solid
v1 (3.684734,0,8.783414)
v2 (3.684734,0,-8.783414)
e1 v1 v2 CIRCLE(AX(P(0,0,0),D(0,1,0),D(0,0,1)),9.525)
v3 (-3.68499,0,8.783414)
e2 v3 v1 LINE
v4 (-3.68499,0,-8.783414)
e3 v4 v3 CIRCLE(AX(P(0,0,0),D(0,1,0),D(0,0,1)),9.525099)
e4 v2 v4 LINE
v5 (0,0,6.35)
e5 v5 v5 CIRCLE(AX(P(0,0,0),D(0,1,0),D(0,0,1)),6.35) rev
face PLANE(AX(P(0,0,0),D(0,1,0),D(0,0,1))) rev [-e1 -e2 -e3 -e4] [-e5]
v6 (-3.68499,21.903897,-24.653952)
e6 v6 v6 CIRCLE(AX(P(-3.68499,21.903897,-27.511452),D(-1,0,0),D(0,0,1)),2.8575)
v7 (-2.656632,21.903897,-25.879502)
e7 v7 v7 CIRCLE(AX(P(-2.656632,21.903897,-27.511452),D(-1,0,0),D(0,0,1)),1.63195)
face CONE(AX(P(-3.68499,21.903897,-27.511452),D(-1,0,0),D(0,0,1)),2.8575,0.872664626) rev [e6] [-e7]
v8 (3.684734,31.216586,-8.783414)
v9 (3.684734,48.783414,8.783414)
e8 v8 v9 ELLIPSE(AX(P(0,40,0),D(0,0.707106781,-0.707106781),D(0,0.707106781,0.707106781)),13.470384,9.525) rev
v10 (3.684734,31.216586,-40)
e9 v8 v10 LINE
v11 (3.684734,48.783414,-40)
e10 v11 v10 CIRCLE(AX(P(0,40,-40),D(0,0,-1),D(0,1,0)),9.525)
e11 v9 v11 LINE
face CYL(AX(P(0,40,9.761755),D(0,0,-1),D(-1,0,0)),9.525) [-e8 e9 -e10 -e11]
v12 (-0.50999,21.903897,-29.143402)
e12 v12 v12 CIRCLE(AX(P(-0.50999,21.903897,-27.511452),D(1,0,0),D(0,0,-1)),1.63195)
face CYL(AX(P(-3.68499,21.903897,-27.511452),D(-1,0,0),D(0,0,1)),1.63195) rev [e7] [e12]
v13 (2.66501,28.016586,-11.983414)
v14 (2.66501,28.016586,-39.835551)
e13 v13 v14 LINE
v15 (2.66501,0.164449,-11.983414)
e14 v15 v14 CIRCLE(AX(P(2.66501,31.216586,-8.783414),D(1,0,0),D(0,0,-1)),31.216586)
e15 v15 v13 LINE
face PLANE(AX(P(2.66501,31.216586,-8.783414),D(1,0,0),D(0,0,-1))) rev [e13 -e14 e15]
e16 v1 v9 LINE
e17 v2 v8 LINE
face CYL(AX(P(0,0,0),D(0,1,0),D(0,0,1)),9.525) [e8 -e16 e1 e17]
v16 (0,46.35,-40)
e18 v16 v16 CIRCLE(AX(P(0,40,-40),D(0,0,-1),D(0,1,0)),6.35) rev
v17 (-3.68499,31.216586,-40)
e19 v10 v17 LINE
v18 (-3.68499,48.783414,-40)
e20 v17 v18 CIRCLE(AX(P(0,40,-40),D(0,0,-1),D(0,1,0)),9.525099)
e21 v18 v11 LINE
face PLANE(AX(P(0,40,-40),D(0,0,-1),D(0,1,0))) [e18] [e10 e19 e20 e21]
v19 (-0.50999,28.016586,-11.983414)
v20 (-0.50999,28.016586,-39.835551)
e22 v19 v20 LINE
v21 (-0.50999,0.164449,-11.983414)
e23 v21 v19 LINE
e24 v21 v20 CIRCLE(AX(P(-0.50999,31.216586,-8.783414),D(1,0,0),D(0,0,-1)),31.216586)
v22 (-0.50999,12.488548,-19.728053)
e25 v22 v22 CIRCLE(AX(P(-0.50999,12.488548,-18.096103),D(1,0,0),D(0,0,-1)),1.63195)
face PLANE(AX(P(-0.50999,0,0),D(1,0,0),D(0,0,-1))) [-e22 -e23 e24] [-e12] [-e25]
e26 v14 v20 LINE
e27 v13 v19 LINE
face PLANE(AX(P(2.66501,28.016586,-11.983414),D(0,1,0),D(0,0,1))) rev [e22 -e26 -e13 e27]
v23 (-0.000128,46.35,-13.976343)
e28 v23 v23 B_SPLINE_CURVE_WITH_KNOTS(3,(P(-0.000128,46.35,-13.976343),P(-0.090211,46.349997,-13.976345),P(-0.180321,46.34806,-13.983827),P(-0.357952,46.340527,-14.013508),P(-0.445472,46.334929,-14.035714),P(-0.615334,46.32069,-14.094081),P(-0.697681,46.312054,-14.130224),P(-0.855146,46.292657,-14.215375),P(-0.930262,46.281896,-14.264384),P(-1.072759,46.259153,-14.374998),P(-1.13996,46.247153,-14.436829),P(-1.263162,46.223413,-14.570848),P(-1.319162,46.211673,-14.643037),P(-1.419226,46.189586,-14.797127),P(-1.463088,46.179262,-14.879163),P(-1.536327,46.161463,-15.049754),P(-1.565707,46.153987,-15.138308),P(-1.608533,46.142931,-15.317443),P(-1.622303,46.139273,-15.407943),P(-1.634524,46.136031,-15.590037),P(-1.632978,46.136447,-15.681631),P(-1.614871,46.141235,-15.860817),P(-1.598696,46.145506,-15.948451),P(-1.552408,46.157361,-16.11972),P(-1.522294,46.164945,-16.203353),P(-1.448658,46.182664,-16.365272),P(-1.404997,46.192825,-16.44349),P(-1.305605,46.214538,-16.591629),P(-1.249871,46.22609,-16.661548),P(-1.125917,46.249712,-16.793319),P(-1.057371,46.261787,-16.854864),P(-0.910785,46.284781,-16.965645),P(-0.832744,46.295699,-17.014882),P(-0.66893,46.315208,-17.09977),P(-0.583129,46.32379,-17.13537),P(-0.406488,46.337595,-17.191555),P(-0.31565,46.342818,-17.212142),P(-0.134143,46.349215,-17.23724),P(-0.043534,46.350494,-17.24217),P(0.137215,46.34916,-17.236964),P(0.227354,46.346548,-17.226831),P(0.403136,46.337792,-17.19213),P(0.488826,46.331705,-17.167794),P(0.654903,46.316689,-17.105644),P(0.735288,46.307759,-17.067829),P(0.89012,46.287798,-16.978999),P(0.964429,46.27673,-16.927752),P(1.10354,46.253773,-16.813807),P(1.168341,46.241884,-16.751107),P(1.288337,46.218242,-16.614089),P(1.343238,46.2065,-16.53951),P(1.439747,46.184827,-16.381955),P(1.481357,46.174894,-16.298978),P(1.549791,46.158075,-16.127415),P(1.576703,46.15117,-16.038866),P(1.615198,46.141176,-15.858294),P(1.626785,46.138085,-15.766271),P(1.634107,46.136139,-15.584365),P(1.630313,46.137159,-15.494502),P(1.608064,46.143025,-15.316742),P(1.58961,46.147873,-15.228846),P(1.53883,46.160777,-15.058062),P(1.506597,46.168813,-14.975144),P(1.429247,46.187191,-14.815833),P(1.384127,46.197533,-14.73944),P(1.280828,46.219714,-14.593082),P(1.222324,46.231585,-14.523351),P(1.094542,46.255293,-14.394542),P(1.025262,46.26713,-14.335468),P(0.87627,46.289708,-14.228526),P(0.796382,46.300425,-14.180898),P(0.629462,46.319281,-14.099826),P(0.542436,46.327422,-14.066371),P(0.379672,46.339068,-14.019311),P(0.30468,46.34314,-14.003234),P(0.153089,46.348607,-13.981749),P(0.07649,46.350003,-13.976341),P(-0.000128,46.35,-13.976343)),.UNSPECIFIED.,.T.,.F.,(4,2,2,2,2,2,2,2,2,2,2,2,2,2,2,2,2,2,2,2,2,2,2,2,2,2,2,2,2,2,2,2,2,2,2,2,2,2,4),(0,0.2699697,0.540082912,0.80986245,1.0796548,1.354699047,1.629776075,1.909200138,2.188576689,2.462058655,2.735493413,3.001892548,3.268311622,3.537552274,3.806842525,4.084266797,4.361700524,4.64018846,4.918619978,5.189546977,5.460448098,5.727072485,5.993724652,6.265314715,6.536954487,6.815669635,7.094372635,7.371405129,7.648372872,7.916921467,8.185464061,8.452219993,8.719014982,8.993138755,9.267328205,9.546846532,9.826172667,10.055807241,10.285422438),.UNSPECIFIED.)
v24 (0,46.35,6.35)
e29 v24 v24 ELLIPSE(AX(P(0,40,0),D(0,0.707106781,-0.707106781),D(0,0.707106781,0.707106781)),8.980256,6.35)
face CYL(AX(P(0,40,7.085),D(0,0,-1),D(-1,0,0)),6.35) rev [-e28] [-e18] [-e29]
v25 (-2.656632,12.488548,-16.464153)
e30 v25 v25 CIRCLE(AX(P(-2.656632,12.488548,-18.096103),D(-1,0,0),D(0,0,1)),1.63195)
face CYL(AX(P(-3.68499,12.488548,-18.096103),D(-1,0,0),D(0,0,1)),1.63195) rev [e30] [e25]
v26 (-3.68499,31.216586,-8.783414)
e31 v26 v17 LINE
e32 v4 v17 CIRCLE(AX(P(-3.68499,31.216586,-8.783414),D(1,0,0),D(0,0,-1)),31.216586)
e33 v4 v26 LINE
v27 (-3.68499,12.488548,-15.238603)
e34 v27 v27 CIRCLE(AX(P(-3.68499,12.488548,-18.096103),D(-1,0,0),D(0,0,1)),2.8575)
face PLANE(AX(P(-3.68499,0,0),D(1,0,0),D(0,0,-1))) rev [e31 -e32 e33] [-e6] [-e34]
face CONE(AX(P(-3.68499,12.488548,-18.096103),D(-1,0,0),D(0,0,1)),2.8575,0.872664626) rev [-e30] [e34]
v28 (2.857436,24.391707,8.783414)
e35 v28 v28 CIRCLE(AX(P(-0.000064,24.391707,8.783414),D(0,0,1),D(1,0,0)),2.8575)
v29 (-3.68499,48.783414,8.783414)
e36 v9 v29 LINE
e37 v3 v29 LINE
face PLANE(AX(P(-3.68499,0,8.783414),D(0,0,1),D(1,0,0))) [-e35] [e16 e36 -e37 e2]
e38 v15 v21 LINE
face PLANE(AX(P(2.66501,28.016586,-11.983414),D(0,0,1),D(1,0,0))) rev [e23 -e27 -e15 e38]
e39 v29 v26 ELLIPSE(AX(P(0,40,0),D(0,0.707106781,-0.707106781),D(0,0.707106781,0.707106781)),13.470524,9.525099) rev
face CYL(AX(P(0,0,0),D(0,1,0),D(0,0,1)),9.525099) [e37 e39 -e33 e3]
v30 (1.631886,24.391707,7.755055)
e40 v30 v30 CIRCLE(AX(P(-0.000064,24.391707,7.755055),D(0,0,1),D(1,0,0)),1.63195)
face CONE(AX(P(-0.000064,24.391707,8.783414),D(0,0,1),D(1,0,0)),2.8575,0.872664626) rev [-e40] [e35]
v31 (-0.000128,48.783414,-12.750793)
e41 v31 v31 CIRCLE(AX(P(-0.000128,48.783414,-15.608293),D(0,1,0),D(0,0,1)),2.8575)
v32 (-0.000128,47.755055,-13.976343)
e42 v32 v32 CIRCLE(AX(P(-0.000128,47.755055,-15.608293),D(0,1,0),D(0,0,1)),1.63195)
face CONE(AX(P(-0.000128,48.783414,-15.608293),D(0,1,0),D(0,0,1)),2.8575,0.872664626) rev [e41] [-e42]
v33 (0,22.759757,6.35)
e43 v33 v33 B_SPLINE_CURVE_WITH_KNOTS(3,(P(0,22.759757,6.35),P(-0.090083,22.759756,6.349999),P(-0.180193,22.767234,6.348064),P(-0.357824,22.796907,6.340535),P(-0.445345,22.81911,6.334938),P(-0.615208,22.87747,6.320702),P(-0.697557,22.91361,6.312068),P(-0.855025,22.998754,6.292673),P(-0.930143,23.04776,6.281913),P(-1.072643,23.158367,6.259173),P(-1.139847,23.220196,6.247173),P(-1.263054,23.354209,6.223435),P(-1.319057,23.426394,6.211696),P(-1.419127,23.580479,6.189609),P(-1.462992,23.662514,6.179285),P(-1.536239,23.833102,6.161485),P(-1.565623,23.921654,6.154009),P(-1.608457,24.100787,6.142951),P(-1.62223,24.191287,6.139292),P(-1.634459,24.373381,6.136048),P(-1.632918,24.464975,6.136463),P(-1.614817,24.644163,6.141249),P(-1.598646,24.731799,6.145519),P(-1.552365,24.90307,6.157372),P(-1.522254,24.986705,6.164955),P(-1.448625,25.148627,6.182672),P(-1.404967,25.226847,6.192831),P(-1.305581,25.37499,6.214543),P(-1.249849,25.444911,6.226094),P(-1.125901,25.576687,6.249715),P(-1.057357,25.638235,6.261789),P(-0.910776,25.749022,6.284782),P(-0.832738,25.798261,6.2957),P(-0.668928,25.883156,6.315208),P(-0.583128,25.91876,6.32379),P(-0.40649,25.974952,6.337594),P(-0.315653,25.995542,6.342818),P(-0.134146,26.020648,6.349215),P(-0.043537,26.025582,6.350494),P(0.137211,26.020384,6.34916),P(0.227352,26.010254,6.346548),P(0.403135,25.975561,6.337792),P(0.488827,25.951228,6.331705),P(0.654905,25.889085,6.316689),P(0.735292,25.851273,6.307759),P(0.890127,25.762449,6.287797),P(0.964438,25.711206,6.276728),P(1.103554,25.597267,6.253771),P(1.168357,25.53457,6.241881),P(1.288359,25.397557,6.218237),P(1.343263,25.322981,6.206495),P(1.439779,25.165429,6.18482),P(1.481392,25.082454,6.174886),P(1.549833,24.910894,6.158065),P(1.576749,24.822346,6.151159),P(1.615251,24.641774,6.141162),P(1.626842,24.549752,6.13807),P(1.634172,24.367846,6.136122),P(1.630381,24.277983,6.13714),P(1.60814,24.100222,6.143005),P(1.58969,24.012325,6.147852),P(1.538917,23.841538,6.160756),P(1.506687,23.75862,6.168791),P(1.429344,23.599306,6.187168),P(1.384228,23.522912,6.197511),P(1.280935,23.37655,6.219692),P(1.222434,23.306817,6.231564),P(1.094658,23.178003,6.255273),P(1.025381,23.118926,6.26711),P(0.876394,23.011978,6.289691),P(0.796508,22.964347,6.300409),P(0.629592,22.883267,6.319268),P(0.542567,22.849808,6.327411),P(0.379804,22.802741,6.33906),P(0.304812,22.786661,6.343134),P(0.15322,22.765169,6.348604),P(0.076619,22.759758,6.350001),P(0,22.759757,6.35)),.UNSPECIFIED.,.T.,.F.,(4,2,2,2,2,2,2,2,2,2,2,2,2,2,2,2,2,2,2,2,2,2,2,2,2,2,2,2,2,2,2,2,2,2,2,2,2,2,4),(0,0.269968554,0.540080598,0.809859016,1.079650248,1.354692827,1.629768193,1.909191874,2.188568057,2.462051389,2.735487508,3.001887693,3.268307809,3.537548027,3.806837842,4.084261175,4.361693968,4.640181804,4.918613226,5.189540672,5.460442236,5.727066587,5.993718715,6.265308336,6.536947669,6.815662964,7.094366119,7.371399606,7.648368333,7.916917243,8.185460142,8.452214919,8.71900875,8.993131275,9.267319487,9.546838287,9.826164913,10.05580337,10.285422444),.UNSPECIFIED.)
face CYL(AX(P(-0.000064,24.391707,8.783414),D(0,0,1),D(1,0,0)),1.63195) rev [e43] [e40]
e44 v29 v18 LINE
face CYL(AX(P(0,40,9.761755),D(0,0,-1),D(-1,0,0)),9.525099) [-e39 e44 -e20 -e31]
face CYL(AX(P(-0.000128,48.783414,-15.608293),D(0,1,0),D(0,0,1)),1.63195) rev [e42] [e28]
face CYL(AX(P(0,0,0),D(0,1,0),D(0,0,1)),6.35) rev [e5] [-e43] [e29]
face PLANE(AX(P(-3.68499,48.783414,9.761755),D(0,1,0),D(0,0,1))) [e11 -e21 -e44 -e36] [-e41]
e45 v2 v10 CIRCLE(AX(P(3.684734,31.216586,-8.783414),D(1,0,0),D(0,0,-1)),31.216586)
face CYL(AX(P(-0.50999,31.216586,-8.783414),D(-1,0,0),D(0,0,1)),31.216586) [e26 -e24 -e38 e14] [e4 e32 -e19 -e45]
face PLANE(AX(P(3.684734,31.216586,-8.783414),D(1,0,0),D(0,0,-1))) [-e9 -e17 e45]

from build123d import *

# Parameters (mm, degrees)
SKETCH2_R                                       = 6.35
BOSS_EXTRUDE3_DEPTH                             = 3.175
BOSS_EXTRUDE4_DEPTH                             = 3.175
BOSS_EXTRUDE5_DEPTH                             = 1.019725
CSK_FOR_4_FLAT_HEAD_MACHINE_SCREW_4_D           = 3.2639
CSK_FOR_4_FLAT_HEAD_MACHINE_SCREW_4_DEPTH       = 3.175
CSK_FOR_4_FLAT_HEAD_MACHINE_SCREW_4_CSINK_D     = 5.715
CSK_FOR_4_FLAT_HEAD_MACHINE_SCREW_4_CSINK_ANGLE = 100


# Read off the part's stored shape, not the designer's step: CSK for #4 Flat Head Machine Screw (100)1
with BuildPart() as part:
    # Sweep1: sweep along a path in Sketch5
    with BuildLine(Plane(origin=(0, 0, 0), x_dir=(0, 0, -1), z_dir=(1, 0, 0))) as sweep1_path:
        Line((0, 0), (0, 40))
        Line((0, 40), (40, 40))
    # Sketch2 → Sweep1 (sweep)
    with BuildSketch(Plane(origin=(0, 0, 0), x_dir=(1, 0, 0), z_dir=(0, 1, 0))):
        with BuildLine():
            Line((-3.684990204, -8.783413773), (3.684734386, -8.783413773))
            ThreePointArc((3.684734386, -8.783413773), (9.525, 0), (3.684734386, 8.783413773))
            Line((3.684734386, 8.783413773), (-3.684990204, 8.783413773))
            ThreePointArc((-3.684990204, 8.783413773), (-9.525098966, 0), (-3.684990204, -8.783413773))
        make_face()
        Circle(SKETCH2_R, mode=Mode.SUBTRACT)
    sweep(path=sweep1_path.line, transition=Transition.RIGHT)

    # CSK for _4 Flat Head Machine Screw _ 2 → CSK for _4 Flat Head Machine Screw _100 (revolve, cut)
    with BuildSketch(Plane(origin=(-0.000127909, 0, -15.608293114), x_dir=(1, 0, 0), z_dir=(0, 0, 1))):
        Polygon((0, 46.136589997), (1.63195, 46.136589997), (1.63195, 47.75505522), (2.8575, 48.783413773), (0, 48.783413773), align=None)
    revolve(axis=Axis((-0.000127909, 0, -15.608293114), (0, 1, 0)), mode=Mode.SUBTRACT)

    # CSK for _4 Flat Head Machine Screw _ 3 o → CSK for _4 Flat Head Machine Screw _ 3 (revolve, cut)
    with BuildSketch(Plane(origin=(-6.3954e-05, 24.391706886, 0), x_dir=(1, 0, 0), z_dir=(0, -1, 0))):
        Polygon((0, 6.13660701), (1.63195, 6.13660701), (1.63195, 7.75505522), (2.8575, 8.783413773), (0, 8.783413773), align=None)
    revolve(axis=Axis((-6.3954e-05, 24.391706886, 0), (0, 0, 1)), mode=Mode.SUBTRACT)

    # Sketch13 → Boss-Extrude3 (add)
    with BuildSketch(Plane(origin=(-3.684990204, 0, 0), x_dir=(0, 0, -1), z_dir=(1, 0, 0))):
        with BuildLine():
            ThreePointArc((11.983413773, 0.164448528), (30.85687358, 9.14312642), (39.835551472, 28.016586227))
            Line((39.835551472, 28.016586227), (11.983413773, 28.016586227))
            Line((11.983413773, 28.016586227), (11.983413773, 0.164448528))
        make_face()
        with BuildLine():
            Line((40, 31.216586227), (8.783413773, 31.216586227))
            Line((8.783413773, 31.216586227), (8.783413773, 0))
            ThreePointArc((8.783413773, 0), (10.385525139, 0.04113924), (11.983413773, 0.164448528))
            Line((11.983413773, 0.164448528), (11.983413773, 28.016586227))
            Line((11.983413773, 28.016586227), (39.835551472, 28.016586227))
            ThreePointArc((39.835551472, 28.016586227), (39.95886076, 29.614474861), (40, 31.216586227))
        make_face()
    extrude(amount=BOSS_EXTRUDE3_DEPTH)

    # Sketch15 → Boss-Extrude4 (add)
    with BuildSketch(Plane(origin=(-0.509990204, 0, 0), x_dir=(0, 0, -1), z_dir=(1, 0, 0))):
        with BuildLine():
            Line((8.783413773, 31.216586227), (40, 31.216586227))
            ThreePointArc((40, 31.216586227), (39.95886076, 29.614474861), (39.835551472, 28.016586227))
            Line((39.835551472, 28.016586227), (11.983413773, 28.016586227))
            Line((11.983413773, 28.016586227), (11.983413773, 0.164448528))
            ThreePointArc((11.983413773, 0.164448528), (10.385525139, 0.04113924), (8.783413773, 0))
            Line((8.783413773, 0), (8.783413773, 31.216586227))
        make_face()
    extrude(amount=BOSS_EXTRUDE4_DEPTH)

    # Sketch16 → Boss-Extrude5 (add)
    with BuildSketch(Plane(origin=(2.665009796, 0, 0), x_dir=(0, 0, -1), z_dir=(1, 0, 0))):
        with BuildLine():
            Line((8.783413773, 31.216586227), (40, 31.216586227))
            ThreePointArc((40, 31.216586227), (30.85687358, 9.14312642), (8.783413773, 0))
            Line((8.783413773, 0), (8.783413773, 31.216586227))
        make_face()
    extrude(amount=BOSS_EXTRUDE5_DEPTH)

    # CSK for _4 Flat Head Machine Screw _ 4
    with Locations(Plane.ZY.offset(3.684990204)):
        with Locations((-27.511452395, 21.903897361), (-18.096102639, 12.488547605)):
            CounterSinkHole(CSK_FOR_4_FLAT_HEAD_MACHINE_SCREW_4_D / 2, CSK_FOR_4_FLAT_HEAD_MACHINE_SCREW_4_CSINK_D / 2, depth=CSK_FOR_4_FLAT_HEAD_MACHINE_SCREW_4_DEPTH, counter_sink_angle=CSK_FOR_4_FLAT_HEAD_MACHINE_SCREW_4_CSINK_ANGLE)


solid = part.part
